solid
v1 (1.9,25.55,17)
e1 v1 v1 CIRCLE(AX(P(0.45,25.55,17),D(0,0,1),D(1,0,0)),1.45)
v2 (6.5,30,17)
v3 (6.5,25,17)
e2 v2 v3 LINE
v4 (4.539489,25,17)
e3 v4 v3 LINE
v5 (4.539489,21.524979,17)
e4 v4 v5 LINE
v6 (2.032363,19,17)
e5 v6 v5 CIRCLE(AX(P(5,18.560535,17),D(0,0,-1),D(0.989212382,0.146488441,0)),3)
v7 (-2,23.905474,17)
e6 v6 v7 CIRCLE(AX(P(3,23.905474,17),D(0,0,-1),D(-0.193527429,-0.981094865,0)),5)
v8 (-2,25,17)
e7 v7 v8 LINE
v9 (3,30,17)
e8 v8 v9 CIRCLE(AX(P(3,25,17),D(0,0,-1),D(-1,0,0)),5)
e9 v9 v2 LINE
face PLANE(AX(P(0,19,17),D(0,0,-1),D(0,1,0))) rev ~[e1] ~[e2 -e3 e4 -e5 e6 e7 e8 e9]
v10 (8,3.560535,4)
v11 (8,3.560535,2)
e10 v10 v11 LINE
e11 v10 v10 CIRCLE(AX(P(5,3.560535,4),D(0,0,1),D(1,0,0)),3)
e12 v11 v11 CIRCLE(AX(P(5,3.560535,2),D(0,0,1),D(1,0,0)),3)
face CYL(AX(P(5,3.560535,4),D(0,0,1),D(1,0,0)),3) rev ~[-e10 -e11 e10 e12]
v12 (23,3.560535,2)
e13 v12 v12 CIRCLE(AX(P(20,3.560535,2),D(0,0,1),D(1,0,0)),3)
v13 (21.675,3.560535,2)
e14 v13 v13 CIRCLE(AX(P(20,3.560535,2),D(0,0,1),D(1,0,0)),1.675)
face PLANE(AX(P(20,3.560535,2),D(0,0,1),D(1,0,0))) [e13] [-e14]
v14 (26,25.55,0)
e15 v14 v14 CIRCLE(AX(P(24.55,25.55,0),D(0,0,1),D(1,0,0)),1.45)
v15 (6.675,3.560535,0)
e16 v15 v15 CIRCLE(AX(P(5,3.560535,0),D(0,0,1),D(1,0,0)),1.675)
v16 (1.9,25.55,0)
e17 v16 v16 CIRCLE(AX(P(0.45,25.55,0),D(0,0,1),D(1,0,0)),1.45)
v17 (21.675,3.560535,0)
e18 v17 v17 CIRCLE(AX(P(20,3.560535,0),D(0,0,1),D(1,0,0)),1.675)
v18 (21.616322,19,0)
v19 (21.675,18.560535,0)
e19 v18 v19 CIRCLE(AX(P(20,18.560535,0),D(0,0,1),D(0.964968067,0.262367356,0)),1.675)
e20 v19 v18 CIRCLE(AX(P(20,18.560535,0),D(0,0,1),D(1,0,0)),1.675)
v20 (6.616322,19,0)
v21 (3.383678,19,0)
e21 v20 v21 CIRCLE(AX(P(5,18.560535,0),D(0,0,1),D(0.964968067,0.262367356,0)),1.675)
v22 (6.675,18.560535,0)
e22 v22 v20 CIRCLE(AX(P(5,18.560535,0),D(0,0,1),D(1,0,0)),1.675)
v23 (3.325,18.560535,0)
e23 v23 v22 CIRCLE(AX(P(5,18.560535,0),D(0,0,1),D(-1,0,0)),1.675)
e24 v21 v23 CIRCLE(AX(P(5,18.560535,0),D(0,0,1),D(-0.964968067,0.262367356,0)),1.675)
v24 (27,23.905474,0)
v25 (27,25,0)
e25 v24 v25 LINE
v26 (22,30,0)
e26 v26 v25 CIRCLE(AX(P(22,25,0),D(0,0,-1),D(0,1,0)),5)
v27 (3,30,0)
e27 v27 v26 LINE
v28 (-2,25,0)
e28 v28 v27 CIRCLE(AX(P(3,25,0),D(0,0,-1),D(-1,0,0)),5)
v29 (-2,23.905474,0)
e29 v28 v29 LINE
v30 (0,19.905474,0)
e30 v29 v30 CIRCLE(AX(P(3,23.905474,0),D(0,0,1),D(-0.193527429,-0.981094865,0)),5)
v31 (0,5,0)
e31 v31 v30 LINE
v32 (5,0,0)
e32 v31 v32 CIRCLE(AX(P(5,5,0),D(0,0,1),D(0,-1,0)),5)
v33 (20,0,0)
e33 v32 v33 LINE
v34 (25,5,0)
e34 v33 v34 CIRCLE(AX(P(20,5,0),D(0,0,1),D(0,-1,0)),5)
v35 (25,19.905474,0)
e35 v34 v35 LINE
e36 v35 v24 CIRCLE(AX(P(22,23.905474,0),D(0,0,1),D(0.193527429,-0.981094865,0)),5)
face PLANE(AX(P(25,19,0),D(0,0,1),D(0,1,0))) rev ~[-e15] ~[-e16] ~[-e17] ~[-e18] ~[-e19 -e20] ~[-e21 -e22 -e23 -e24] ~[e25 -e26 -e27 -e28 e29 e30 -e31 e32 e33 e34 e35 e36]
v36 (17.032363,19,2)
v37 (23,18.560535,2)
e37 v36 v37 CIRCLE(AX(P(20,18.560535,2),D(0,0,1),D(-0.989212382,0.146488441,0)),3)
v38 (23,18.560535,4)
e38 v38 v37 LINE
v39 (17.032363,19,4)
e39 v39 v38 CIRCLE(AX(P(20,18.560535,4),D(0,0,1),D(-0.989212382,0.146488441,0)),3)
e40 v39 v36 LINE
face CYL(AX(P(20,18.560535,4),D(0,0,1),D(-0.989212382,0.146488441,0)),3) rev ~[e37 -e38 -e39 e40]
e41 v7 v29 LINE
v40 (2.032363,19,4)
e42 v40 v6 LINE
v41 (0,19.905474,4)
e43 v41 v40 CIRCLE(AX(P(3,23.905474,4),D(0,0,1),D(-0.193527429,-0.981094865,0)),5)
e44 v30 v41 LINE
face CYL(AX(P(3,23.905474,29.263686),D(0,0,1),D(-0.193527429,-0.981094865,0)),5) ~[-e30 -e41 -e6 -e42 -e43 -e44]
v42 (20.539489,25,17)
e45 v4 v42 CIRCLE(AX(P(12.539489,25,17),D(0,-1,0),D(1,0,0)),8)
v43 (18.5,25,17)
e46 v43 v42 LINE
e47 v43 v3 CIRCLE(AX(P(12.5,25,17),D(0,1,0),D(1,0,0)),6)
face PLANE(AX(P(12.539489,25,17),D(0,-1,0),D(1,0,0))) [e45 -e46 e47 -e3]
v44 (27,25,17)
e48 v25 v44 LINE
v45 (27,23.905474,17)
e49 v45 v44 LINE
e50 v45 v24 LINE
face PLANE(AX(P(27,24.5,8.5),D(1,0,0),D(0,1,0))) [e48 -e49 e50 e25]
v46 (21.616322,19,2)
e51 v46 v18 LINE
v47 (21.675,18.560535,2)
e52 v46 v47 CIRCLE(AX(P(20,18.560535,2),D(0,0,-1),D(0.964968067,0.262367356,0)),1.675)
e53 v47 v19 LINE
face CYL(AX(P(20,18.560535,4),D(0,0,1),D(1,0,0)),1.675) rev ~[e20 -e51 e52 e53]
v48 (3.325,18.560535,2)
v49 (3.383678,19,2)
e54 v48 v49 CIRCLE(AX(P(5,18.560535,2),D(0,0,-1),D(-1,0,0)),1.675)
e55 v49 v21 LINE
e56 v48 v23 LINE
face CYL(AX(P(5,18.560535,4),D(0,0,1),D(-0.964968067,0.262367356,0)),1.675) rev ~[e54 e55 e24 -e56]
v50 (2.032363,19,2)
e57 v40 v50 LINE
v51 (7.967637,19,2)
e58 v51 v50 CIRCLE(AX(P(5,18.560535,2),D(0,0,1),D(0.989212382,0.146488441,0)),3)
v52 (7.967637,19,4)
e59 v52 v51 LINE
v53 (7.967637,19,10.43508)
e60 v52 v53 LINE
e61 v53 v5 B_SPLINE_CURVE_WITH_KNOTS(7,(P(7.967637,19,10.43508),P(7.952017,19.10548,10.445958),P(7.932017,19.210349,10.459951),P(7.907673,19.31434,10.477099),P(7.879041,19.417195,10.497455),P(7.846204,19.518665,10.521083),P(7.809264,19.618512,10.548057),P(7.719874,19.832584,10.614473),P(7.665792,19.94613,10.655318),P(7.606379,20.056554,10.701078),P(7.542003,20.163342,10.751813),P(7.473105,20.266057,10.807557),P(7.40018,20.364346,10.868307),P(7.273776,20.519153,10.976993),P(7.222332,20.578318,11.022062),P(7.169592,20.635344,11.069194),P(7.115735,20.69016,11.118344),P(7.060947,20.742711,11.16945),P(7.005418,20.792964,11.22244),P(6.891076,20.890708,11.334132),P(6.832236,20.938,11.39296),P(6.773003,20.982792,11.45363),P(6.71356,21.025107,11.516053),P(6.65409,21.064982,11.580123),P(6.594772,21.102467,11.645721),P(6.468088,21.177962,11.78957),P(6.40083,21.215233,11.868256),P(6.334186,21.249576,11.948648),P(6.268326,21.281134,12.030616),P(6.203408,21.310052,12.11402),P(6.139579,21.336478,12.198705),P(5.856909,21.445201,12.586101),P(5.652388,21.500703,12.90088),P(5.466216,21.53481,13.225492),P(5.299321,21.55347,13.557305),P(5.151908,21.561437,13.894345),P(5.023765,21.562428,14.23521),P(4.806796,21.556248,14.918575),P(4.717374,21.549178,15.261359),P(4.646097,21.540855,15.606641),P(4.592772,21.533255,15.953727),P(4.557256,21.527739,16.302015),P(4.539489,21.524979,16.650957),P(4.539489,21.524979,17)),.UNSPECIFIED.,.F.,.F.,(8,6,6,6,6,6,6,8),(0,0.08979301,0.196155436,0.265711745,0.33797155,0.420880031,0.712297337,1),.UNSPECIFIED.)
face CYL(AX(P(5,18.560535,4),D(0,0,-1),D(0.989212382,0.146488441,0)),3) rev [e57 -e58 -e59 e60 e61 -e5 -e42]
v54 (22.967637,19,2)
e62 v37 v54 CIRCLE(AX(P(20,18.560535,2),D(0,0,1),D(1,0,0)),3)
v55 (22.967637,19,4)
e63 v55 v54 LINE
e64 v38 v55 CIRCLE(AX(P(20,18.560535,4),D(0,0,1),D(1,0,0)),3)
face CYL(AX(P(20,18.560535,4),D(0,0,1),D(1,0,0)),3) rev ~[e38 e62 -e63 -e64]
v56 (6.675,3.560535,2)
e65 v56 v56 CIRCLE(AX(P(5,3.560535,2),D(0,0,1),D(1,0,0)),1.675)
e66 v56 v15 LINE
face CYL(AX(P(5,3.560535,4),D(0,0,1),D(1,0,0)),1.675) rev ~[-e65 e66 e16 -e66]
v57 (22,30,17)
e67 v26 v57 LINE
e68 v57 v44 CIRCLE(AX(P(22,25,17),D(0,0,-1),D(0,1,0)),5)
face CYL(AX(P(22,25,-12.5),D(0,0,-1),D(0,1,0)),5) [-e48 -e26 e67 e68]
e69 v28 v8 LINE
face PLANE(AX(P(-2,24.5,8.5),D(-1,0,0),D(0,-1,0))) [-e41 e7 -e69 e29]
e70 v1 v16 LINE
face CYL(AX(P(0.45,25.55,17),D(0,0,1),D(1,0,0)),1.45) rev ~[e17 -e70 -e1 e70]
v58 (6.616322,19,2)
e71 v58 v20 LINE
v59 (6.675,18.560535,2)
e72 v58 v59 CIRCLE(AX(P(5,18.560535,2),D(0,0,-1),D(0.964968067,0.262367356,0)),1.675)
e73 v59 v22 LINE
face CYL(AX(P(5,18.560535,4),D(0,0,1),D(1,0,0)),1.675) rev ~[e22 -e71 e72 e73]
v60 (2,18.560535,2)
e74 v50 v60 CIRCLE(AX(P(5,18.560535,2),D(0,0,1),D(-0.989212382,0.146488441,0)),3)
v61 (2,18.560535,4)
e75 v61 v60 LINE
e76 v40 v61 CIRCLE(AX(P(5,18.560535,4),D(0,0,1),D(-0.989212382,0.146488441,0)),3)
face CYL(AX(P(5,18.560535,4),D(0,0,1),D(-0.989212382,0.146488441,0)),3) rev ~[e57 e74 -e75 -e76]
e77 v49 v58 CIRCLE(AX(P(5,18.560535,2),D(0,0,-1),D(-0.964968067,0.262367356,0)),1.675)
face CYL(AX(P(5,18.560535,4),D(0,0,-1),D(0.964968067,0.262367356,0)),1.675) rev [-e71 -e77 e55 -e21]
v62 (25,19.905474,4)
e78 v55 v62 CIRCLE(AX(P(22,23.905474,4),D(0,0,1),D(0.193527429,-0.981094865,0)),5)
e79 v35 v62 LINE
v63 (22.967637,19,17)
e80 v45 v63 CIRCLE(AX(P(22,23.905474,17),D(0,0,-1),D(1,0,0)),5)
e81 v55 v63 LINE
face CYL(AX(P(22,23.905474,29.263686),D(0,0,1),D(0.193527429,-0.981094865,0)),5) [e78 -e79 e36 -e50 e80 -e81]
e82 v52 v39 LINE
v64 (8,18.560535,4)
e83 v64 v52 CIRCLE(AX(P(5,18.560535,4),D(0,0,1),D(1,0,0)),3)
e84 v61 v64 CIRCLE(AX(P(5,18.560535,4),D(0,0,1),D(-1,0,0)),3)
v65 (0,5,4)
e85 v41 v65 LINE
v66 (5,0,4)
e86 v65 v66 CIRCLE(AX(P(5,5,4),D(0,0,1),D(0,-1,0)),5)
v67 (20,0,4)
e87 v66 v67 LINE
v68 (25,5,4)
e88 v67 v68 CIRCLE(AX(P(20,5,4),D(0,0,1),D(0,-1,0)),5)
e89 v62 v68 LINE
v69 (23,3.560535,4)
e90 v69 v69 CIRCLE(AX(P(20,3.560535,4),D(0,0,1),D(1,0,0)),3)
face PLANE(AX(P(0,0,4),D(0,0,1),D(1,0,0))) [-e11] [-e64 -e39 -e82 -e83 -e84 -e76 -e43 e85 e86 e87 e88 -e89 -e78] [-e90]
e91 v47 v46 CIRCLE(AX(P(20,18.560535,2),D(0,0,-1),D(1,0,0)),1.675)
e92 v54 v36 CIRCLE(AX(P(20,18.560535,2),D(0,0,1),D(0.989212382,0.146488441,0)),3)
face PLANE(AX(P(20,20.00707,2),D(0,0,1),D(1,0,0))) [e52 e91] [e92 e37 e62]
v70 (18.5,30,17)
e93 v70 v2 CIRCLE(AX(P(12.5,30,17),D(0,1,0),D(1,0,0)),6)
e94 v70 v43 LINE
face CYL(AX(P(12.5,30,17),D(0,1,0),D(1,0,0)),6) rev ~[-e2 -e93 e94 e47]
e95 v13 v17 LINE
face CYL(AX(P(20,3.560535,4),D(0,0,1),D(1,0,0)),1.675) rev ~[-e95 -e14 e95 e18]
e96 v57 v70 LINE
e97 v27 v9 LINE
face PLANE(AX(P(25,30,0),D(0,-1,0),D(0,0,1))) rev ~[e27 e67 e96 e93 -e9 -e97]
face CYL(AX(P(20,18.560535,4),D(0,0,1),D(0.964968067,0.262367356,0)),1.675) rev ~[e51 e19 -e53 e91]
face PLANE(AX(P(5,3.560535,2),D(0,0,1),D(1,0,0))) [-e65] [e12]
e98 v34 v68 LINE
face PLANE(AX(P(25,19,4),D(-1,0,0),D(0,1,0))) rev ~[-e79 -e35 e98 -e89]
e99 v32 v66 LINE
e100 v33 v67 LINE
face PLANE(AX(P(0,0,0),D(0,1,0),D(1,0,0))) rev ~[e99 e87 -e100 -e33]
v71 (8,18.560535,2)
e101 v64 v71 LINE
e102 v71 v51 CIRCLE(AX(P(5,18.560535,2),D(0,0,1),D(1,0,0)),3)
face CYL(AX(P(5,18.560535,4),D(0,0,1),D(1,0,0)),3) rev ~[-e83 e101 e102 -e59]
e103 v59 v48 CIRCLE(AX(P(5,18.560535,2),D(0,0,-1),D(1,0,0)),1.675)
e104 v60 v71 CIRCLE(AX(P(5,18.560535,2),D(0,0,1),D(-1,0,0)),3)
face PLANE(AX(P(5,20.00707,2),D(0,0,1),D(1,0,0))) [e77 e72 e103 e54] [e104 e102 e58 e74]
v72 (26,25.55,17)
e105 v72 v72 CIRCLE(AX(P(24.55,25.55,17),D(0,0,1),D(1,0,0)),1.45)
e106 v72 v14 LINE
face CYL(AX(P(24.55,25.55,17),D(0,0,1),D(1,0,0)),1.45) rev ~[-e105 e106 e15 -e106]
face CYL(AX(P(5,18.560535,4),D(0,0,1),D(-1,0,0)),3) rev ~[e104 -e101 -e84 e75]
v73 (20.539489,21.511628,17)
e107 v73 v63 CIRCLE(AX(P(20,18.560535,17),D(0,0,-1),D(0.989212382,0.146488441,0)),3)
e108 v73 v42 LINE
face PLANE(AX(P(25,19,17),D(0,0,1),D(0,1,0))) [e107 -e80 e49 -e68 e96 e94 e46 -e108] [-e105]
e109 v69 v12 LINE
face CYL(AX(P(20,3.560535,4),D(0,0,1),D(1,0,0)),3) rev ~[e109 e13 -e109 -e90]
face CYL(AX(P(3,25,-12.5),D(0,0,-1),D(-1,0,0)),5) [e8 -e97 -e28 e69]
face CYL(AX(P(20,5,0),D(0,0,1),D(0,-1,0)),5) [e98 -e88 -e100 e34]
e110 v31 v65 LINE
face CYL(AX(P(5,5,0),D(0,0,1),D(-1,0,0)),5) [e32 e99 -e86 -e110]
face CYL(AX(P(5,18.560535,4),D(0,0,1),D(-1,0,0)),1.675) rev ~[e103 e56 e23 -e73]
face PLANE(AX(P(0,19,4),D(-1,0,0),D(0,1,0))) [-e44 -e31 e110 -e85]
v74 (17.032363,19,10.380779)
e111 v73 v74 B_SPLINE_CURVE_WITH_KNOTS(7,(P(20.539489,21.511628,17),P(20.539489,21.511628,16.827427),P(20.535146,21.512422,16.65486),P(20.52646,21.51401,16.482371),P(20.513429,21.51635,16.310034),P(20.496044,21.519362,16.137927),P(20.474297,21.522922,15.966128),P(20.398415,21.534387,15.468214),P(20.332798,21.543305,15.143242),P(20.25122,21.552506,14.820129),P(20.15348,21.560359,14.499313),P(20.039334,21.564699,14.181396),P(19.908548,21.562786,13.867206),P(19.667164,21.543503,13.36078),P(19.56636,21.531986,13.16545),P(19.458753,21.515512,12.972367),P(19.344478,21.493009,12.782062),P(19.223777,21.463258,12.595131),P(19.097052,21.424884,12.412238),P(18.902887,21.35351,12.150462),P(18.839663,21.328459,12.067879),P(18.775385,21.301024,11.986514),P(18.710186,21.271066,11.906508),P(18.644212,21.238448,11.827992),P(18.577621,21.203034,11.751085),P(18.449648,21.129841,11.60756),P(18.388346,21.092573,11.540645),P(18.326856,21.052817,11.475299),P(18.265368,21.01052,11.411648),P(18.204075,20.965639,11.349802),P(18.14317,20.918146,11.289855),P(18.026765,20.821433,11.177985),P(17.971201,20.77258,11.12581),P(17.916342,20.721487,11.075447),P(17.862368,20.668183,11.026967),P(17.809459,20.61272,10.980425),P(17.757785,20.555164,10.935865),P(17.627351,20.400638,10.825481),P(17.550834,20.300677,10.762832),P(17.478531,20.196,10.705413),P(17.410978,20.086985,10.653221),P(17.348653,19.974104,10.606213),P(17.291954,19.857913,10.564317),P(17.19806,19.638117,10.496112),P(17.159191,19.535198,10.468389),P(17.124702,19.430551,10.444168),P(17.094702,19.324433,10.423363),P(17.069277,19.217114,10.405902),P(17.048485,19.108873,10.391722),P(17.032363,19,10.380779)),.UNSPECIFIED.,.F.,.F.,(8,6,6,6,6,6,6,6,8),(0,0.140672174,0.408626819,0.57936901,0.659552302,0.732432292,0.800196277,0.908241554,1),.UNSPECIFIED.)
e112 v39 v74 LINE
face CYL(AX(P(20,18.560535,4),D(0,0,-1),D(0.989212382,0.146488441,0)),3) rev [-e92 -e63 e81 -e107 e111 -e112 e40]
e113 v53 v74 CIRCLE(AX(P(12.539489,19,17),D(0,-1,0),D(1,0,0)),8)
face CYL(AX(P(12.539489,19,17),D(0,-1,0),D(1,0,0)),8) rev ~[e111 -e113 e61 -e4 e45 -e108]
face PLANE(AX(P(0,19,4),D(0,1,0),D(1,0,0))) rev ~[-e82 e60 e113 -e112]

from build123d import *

# Parameters (mm, degrees)
F0_W           = 25
F0_H           = 30
F1_DEPTH       = 4
F2_W           = 25
F2_H           = 11
F3_DEPTH       = 13
F4_R           = 1.675
F5_DEPTH       = 25
F5_DEPTH_BACK  = 25
F7_DEPTH       = 6
F8_R           = 8
F9_DEPTH       = 6
F4_R_2         = 3
F10_DEPTH      = 2
F10_DEPTH_BACK = 25
F11_R          = 5
F13_DEPTH      = 2
F14_W          = 11
F14_H          = 17
F15_DEPTH      = 2
F16_R          = 1.45
F17_DEPTH      = 25
F18_T1_DEPTH   = 42
F18_T6_DEPTH   = 41.5273716251
F18_T11_DEPTH  = 41.5273716251
F18_T16_DEPTH  = 41.5273716251
F18_T21_DEPTH  = 41.5273716251


# Not quite as in the source:
# - a fillet or chamfer that OpenCascade refuses, or shapes differently, is made with other operations: its cross-section is extruded or revolved along the edge and cut away or added


with BuildPart() as f1:
    # F0 (on Top) → F1 (new body)
    with BuildSketch(Plane.XY):
        with Locations((12.5, 15)):
            Rectangle(F0_W, F0_H)
    extrude(amount=F1_DEPTH)

    # F2 (on face) → F3 (join)
    with BuildSketch(Plane.XY.offset(4)):
        with Locations((12.5, 24.5)):
            Rectangle(F2_W, F2_H)
    extrude(amount=F3_DEPTH)

    # F4 (on face) → F5 (cut, two sides)
    with BuildSketch(Plane.XY.offset(4)) as f5_sk:
        with BuildLine():
            ThreePointArc((3.325, 18.5605346784), (5, 16.8855346784), (6.675, 18.5605346784))
            ThreePointArc((6.675, 18.5605346784), (6.6602655711, 18.7822174099), (6.6163215123, 19))
            Line((6.6163215123, 19), (3.3836784877, 19))
            ThreePointArc((3.3836784877, 19), (3.3397344289, 18.7822174099), (3.325, 18.5605346784))
        make_face()
        with BuildLine():
            ThreePointArc((21.6163215123, 19), (20, 20.2355346784), (18.3836784877, 19))
            Line((18.3836784877, 19), (21.6163215123, 19))
        make_face()
        with BuildLine():
            Line((21.6163215123, 19), (18.3836784877, 19))
            ThreePointArc((18.3836784877, 19), (19.7783172685, 16.9002691073), (21.675, 18.5605346784))
            ThreePointArc((21.675, 18.5605346784), (21.6602655711, 18.7822174099), (21.6163215123, 19))
        make_face()
        with Locations((20, 3.5605346784)):
            Circle(F4_R)
        with Locations((5, 3.5605346784)):
            Circle(F4_R)
        with BuildLine():
            Line((3.3836784877, 19), (6.6163215123, 19))
            ThreePointArc((6.6163215123, 19), (5, 20.2355346784), (3.3836784877, 19))
        make_face()
    extrude(amount=-F5_DEPTH, mode=Mode.SUBTRACT)
    extrude(f5_sk.sketch, amount=F5_DEPTH_BACK, mode=Mode.SUBTRACT)

    # F6 (on face) → F7 (cut)
    with BuildSketch(Plane(origin=(0, 30, 0), x_dir=(-1, 0, 0), z_dir=(0, 1, 0))):
        with BuildLine():
            ThreePointArc((-18.5, 17), (-12.5, 11), (-6.5, 17))
            Line((-6.5, 17), (-18.5, 17))
        make_face()
    extrude(amount=-F7_DEPTH, mode=Mode.SUBTRACT)

    # F8 (on face) → F9 (cut)
    with BuildSketch(Plane.XZ.offset(-19)):
        with Locations((12.5394891948, 17)):
            Circle(F8_R)
    extrude(amount=-F9_DEPTH, mode=Mode.SUBTRACT)

    # F4 (on face) → F10 (cut, two sides)
    with BuildSketch(Plane.XY.offset(4)) as f10_sk:
        with BuildLine():
            ThreePointArc((3.3836784877, 19), (5, 20.2355346784), (6.6163215123, 19))
            Line((6.6163215123, 19), (7.9676371461, 19))
            ThreePointArc((7.9676371461, 19), (5, 21.5605346784), (2.0323628539, 19))
            Line((2.0323628539, 19), (3.3836784877, 19))
        make_face()
        with BuildLine():
            Line((2, 18.5605346784), (3.325, 18.5605346784))
            ThreePointArc((3.325, 18.5605346784), (3.3397344289, 18.7822174099), (3.3836784877, 19))
            Line((3.3836784877, 19), (2.0323628539, 19))
            ThreePointArc((2.0323628539, 19), (2.0081016529, 18.7808623453), (2, 18.5605346784))
        make_face()
        with BuildLine():
            ThreePointArc((6.6163215123, 19), (6.6602655711, 18.7822174099), (6.675, 18.5605346784))
            ThreePointArc((6.675, 18.5605346784), (5, 16.8855346784), (3.325, 18.5605346784))
            Line((3.325, 18.5605346784), (2, 18.5605346784))
            ThreePointArc((2, 18.5605346784), (5, 15.5605346784), (8, 18.5605346784))
            ThreePointArc((8, 18.5605346784), (7.9918983471, 18.7808623453), (7.9676371461, 19))
            Line((7.9676371461, 19), (6.6163215123, 19))
        make_face()
        with BuildLine():
            ThreePointArc((22.9676371461, 19), (20, 21.5605346784), (17.0323628539, 19))
            Line((17.0323628539, 19), (18.3836784877, 19))
            ThreePointArc((18.3836784877, 19), (20, 20.2355346784), (21.6163215123, 19))
            Line((21.6163215123, 19), (22.9676371461, 19))
        make_face()
        with BuildLine():
            Line((18.3836784877, 19), (17.0323628539, 19))
            ThreePointArc((17.0323628539, 19), (19.7796723331, 15.5686363313), (23, 18.5605346784))
            ThreePointArc((23, 18.5605346784), (22.9918983471, 18.7808623453), (22.9676371461, 19))
            Line((22.9676371461, 19), (21.6163215123, 19))
            ThreePointArc((21.6163215123, 19), (21.6602655711, 18.7822174099), (21.675, 18.5605346784))
            ThreePointArc((21.675, 18.5605346784), (19.7783172685, 16.9002691073), (18.3836784877, 19))
        make_face()
        with Locations((20, 3.5605346784)):
            Circle(F4_R_2)
        with Locations((20, 3.5605346784)):
            Circle(F4_R, mode=Mode.SUBTRACT)
        with Locations((5, 3.5605346784)):
            Circle(F4_R_2)
        with Locations((5, 3.5605346784)):
            Circle(F4_R, mode=Mode.SUBTRACT)
    extrude(amount=-F10_DEPTH, mode=Mode.SUBTRACT)
    extrude(f10_sk.sketch, amount=F10_DEPTH_BACK, mode=Mode.SUBTRACT)

    # F11
    f11_edges = [f1.edges().sort_by_distance(p)[0] for p in [
        (0, 0, 2),
        (25, 0, 2),
    ]]
    fillet(f11_edges, radius=F11_R)

    # F12 (on face) → F13 (join)
    with BuildSketch(Plane(origin=(0, 0, 0), x_dir=(0, -1, 0), z_dir=(-1, 0, 0))):
        Polygon((-30, 17), (-30, 0), (-19, 0), (-19, 4), (-19, 17), align=None)
    extrude(amount=F13_DEPTH)

    # F14 (on face) → F15 (join)
    with BuildSketch(Plane.YZ.offset(25)):
        with Locations((24.5, 8.5)):
            Rectangle(F14_W, F14_H)
    extrude(amount=F15_DEPTH)

    # F16 (on face) → F17 (cut)
    with BuildSketch(Plane.XY.offset(17)):
        with Locations((0.45, 25.55)):
            Circle(F16_R)
        with Locations((24.55, 25.55)):
            Circle(F16_R)
    extrude(amount=-F17_DEPTH, mode=Mode.SUBTRACT)

    # F18: fillet of radius 5 on 4 edges, made by hand

    # F18_s2 → F18_t1 (cut)
    with BuildSketch(Plane.XY.offset(-12.5)):
        with BuildLine():
            ThreePointArc((-2, 25), (-0.5355339059, 28.5355339059), (3, 30))
            Line((3, 30), (-2, 30))
            Line((-2, 30), (-2, 25))
        make_face()
        with BuildLine():
            ThreePointArc((22, 30), (25.5355339059, 28.5355339059), (27, 25))
            Line((27, 25), (27, 30))
            Line((27, 30), (22, 30))
        make_face()
    extrude(amount=F18_T1_DEPTH, mode=Mode.SUBTRACT)


with BuildPart() as f18_tool4:
    # F18_s5 → F18_t6 (new body)
    with BuildSketch(Plane.XY.offset(29.2636858126)):
        with BuildLine():
            ThreePointArc((2.0323628539, 19), (-0.8625241572, 20.7304298947), (-2, 23.905474325))
            Line((-2, 23.905474325), (-2, 19))
            Line((-2, 19), (2.0323628539, 19))
        make_face()
    extrude(amount=-F18_T6_DEPTH)

    split(bisect_by=Plane.XY.offset(4), keep=Keep.TOP)


with BuildPart() as f1_1:
    add(f1.part)

    # F18_t3: cut F18_tool4
    add(f18_tool4.part, mode=Mode.SUBTRACT)


with BuildPart() as f18_tool9:
    # F18_s10 → F18_t11 (new body)
    with BuildSketch(Plane.XY.offset(29.2636858126)):
        with BuildLine():
            ThreePointArc((2.0323628539, 19), (-0.8625241572, 20.7304298947), (-2, 23.905474325))
            Line((-2, 23.905474325), (-2, 19))
            Line((-2, 19), (2.0323628539, 19))
        make_face()
    extrude(amount=-F18_T11_DEPTH)

    split(bisect_by=Plane.YZ, keep=Keep.BOTTOM)


with BuildPart() as f1_2:
    add(f1_1.part)

    # F18_t8: cut F18_tool9
    add(f18_tool9.part, mode=Mode.SUBTRACT)


with BuildPart() as f18_tool14:
    # F18_s15 → F18_t16 (new body)
    with BuildSketch(Plane.XY.offset(29.2636858126)):
        with BuildLine():
            ThreePointArc((22.9676371461, 19), (25.8625241572, 20.7304298947), (27, 23.905474325))
            Line((27, 23.905474325), (27, 19))
            Line((27, 19), (22.9676371461, 19))
        make_face()
    extrude(amount=-F18_T16_DEPTH)

    split(bisect_by=Plane.XY.offset(4), keep=Keep.TOP)


with BuildPart() as f1_3:
    add(f1_2.part)

    # F18_t13: cut F18_tool14
    add(f18_tool14.part, mode=Mode.SUBTRACT)


with BuildPart() as f18_tool19:
    # F18_s20 → F18_t21 (new body)
    with BuildSketch(Plane.XY.offset(29.2636858126)):
        with BuildLine():
            ThreePointArc((22.9676371461, 19), (25.8625241572, 20.7304298947), (27, 23.905474325))
            Line((27, 23.905474325), (27, 19))
            Line((27, 19), (22.9676371461, 19))
        make_face()
    extrude(amount=-F18_T21_DEPTH)

    split(bisect_by=Plane.YZ.offset(25), keep=Keep.TOP)


with BuildPart() as f1_4:
    add(f1_3.part)

    # F18_t18: cut F18_tool19
    add(f18_tool19.part, mode=Mode.SUBTRACT)


solid = f1_4.part
